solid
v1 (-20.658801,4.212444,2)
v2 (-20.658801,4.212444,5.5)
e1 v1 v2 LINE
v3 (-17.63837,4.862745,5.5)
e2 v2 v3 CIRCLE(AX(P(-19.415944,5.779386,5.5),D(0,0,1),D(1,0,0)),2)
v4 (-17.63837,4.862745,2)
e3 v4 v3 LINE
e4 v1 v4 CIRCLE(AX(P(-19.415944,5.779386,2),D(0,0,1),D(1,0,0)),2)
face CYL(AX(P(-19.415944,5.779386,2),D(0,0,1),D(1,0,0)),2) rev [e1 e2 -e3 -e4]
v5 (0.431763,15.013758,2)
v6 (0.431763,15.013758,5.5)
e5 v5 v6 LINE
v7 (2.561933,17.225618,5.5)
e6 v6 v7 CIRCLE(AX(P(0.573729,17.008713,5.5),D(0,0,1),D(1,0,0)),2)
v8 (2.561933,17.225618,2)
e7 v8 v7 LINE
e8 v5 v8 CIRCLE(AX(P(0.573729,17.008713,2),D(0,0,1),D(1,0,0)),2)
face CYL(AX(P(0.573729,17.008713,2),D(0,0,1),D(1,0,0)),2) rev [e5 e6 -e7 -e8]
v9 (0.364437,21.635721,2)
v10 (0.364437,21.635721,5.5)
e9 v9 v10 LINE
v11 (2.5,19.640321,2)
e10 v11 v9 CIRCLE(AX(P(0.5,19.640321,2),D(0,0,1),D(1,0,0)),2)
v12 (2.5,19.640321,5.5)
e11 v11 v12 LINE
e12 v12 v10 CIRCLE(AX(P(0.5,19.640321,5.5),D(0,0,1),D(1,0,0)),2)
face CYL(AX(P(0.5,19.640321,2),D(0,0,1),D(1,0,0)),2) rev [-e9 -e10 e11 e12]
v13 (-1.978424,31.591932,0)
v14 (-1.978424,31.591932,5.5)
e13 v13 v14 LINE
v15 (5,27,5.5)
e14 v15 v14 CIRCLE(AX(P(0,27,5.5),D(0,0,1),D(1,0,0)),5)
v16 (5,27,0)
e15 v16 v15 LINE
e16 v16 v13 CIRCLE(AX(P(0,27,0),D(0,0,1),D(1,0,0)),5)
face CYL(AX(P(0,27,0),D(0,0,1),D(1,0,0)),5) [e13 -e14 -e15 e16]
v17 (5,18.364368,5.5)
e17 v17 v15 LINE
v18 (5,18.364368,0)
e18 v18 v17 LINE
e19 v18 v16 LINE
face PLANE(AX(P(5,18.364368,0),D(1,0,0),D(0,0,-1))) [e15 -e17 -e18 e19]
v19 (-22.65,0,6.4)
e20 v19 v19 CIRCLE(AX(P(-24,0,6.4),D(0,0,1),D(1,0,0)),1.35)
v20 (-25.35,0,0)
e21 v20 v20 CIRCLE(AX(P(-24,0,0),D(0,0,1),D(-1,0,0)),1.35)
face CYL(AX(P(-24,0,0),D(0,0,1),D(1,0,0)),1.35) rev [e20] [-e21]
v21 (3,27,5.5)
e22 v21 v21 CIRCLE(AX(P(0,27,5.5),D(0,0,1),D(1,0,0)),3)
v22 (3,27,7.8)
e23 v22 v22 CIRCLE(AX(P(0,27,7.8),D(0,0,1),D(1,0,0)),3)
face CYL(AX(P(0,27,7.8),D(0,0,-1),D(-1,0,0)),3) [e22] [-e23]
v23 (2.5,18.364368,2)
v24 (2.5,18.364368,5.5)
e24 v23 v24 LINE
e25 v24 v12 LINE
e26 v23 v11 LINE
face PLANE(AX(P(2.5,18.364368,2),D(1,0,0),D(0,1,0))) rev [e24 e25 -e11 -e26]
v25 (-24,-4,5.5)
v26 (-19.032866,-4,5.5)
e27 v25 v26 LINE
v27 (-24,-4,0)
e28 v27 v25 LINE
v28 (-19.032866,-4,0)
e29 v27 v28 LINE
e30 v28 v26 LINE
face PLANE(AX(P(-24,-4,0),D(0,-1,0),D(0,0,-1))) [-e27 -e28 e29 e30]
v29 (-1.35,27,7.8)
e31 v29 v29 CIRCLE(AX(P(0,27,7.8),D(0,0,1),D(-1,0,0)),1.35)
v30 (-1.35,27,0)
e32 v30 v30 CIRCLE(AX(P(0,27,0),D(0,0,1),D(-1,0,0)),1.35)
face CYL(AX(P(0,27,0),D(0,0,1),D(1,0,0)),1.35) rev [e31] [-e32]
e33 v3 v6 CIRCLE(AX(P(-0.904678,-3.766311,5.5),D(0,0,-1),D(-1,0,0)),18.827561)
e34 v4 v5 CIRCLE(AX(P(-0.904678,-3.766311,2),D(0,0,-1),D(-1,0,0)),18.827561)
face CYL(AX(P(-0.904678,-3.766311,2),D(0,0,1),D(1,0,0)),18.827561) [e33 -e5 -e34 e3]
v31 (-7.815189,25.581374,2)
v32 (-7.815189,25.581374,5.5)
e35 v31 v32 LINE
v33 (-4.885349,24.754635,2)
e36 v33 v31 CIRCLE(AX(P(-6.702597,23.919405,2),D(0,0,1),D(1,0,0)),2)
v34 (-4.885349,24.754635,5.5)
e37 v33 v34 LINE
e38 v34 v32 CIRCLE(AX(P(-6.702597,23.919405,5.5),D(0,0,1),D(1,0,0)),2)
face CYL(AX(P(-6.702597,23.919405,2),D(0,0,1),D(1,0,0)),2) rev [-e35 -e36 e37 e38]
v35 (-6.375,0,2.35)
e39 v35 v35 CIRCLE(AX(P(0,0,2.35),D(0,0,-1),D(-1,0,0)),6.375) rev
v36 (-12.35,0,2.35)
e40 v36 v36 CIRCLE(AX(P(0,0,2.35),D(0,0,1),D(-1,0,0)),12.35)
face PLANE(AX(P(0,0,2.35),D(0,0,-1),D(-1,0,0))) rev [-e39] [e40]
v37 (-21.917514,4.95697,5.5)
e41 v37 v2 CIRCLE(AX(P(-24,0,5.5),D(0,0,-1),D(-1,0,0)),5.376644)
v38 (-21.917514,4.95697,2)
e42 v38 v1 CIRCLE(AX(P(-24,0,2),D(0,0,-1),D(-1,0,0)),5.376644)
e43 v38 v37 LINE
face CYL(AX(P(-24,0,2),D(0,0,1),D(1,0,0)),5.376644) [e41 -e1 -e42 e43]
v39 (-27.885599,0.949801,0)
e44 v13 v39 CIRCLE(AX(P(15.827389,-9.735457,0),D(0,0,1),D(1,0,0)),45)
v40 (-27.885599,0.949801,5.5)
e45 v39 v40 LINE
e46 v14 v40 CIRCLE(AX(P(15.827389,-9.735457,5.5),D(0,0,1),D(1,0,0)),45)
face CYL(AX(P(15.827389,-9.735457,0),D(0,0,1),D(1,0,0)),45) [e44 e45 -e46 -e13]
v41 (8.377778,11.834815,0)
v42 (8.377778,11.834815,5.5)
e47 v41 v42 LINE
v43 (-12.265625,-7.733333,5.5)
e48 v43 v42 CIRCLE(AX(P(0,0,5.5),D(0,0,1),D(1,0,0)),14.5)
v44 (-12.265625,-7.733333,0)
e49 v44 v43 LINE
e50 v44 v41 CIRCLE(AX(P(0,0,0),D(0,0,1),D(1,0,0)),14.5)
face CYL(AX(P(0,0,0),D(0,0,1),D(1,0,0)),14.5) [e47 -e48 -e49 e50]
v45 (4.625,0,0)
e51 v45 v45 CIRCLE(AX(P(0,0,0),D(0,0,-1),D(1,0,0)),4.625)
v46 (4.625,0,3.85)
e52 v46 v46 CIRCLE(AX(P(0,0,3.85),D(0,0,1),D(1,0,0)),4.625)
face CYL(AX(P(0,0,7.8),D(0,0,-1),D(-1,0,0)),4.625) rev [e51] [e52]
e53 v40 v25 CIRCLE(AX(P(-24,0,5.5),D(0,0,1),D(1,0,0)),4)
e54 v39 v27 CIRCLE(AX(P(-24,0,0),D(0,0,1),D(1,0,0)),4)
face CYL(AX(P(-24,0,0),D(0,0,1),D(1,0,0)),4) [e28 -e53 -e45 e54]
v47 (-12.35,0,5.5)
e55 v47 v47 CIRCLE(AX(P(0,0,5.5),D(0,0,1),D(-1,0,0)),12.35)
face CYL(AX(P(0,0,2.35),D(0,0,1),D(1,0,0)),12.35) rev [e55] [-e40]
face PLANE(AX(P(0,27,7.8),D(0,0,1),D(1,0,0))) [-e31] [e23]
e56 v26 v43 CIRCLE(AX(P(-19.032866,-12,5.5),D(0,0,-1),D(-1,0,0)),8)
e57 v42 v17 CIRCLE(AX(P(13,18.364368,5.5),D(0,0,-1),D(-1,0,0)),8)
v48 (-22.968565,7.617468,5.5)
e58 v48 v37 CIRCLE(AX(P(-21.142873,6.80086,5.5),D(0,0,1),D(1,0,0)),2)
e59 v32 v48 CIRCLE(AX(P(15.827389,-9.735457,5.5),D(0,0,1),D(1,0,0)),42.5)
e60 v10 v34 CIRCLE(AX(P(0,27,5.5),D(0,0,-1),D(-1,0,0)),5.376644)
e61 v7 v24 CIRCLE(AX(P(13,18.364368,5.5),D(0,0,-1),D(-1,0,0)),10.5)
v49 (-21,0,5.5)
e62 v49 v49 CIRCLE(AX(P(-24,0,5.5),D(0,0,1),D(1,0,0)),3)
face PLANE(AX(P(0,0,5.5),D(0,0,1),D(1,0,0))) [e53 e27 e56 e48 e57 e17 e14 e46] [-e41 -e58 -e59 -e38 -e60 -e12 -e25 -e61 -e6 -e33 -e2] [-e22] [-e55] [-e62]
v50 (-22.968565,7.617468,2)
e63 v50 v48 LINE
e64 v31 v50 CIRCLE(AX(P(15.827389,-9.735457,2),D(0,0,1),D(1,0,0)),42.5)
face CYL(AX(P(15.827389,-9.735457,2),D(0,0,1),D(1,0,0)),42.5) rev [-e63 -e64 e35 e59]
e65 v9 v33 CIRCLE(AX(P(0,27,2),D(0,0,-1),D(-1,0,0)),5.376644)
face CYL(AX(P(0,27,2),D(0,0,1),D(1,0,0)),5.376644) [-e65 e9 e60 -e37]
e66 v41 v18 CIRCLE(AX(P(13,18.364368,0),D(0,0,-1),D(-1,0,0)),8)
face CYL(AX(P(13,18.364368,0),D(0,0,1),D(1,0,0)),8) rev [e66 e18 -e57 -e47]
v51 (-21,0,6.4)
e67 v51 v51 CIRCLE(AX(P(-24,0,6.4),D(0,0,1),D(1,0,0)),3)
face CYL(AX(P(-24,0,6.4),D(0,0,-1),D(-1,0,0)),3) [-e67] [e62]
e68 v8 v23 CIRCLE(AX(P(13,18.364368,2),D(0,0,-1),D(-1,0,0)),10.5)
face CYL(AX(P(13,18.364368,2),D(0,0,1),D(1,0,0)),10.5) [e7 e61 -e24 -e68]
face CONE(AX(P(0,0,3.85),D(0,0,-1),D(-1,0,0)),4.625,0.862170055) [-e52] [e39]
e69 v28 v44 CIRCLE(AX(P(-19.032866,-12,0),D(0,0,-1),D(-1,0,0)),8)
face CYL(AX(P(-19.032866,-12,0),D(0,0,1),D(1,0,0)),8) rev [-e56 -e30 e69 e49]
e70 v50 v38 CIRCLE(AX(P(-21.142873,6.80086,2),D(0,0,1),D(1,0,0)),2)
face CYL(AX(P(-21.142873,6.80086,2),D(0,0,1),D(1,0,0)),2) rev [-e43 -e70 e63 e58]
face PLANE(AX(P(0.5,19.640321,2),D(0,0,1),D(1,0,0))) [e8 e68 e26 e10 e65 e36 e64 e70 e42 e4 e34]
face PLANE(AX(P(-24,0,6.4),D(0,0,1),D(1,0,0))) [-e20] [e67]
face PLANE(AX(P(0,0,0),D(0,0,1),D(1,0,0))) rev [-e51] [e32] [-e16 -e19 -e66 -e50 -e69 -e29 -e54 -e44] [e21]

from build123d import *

# Parameters (mm, degrees)
BOSS_EXTRUDE1_DEPTH = 5.5
SKETCH2_R           = 3
BOSS_EXTRUDE2_DEPTH = 2.3
SKETCH3_R           = 3
BOSS_EXTRUDE3_DEPTH = 0.9
SKETCH4_R           = 4.625
CUT_EXTRUDE1_DEPTH  = 44.230082119
SKETCH5_R           = 1.35
CUT_EXTRUDE2_DEPTH  = 44.230082119
SKETCH7_R           = 12.35
CUT_EXTRUDE4_DEPTH  = 3.15
CUT_EXTRUDE5_DEPTH  = 3.5
SKETCH9_R           = 6.375
SKETCH9_R_2         = 4.625
BOSS_EXTRUDE4_DEPTH = 1.5
CHAMFER1_SIZE2      = 1.75
CHAMFER1_SIZE       = 1.5


with BuildPart() as part:
    # Sketch1 → Boss-Extrude1 (new body)
    with BuildSketch(Plane.XY.offset(5.5)):
        with BuildLine():
            Line((5, 18.364367672), (5, 27))
            ThreePointArc((5, 27), (2.748443387, 31.176847968), (-1.978423579, 31.591932071))
            ThreePointArc((-1.978423579, 31.591932071), (-18.536483892, 19.318360138), (-27.885598891, 0.94980064))
            ThreePointArc((-27.885598891, 0.94980064), (-27.146363183, -2.469898524), (-24, -4))
            Line((-24, -4), (-19.032866311, -4))
            ThreePointArc((-19.032866311, -4), (-15.168499178, -4.995239714), (-12.265624956, -7.733333333))
            ThreePointArc((-12.265624956, -7.733333333), (9.975316712, -10.523452689), (8.377777778, 11.834814722))
            ThreePointArc((8.377777778, 11.834814722), (5.894446616, 14.688621338), (5, 18.364367672))
        make_face()
    extrude(amount=-BOSS_EXTRUDE1_DEPTH)

    # Sketch2 → Boss-Extrude2 (add)
    with BuildSketch(Plane.XY.offset(5.5)):
        with Locations((0, 27)):
            Circle(SKETCH2_R)
    extrude(amount=BOSS_EXTRUDE2_DEPTH)

    # Sketch3 → Boss-Extrude3 (add)
    with BuildSketch(Plane.XY.offset(5.5)):
        with Locations((-24, 0)):
            Circle(SKETCH3_R)
    extrude(amount=BOSS_EXTRUDE3_DEPTH)

    # Sketch4 → Cut-Extrude1 (cut, through all)
    with BuildSketch(Plane(origin=(0, 0, 0), x_dir=(-1, 0, 0), z_dir=(0, 0, -1))):
        with Locations(Location((0, 0, 0), (0, 0, 180))):
            Circle(SKETCH4_R)
    extrude(amount=-CUT_EXTRUDE1_DEPTH, mode=Mode.SUBTRACT)

    # Sketch5 → Cut-Extrude2 (cut, through all)
    with BuildSketch(Plane.XY.offset(7.8)):
        with Locations(Location((0, 27, 0), (0, 0, 180))):
            Circle(SKETCH5_R)
        with Locations((-24, 0)):
            Circle(SKETCH5_R)
    extrude(amount=-CUT_EXTRUDE2_DEPTH, mode=Mode.SUBTRACT)

    # Sketch7 → Cut-Extrude4 (cut)
    with BuildSketch(Plane.XY.offset(5.5)):
        with Locations(Location((0, 0, 0), (0, 0, 180))):
            Circle(SKETCH7_R)
    extrude(amount=-CUT_EXTRUDE4_DEPTH, mode=Mode.SUBTRACT)

    # Sketch8 → Cut-Extrude5 (cut)
    with BuildSketch(Plane.XY.offset(5.5)):
        with BuildLine():
            Line((2.5, 18.364367672), (2.5, 19.640321115))
            ThreePointArc((2.5, 19.640321115), (1.865443882, 21.101677678), (0.364436994, 21.635721494))
            ThreePointArc((0.364436994, 21.635721494), (-2.746191158, 22.377583712), (-4.885348815, 24.754634735))
            ThreePointArc((-4.885348815, 24.754634735), (-6.159449386, 25.844240566), (-7.815189176, 25.581373906))
            ThreePointArc((-7.815189176, 25.581373906), (-16.658270057, 17.667681565), (-22.968564749, 7.617468292))
            ThreePointArc((-22.968564749, 7.617468292), (-23.002979343, 6.066010594), (-21.917514319, 4.956970002))
            ThreePointArc((-21.917514319, 4.956970002), (-21.262726036, 4.627702396), (-20.658800912, 4.212444287))
            ThreePointArc((-20.658800912, 4.212444287), (-18.994988647, 3.824188919), (-17.638370065, 4.862745371))
            ThreePointArc((-17.638370065, 4.862745371), (-10.125827676, 12.648544298), (0.431762956, 15.013758475))
            ThreePointArc((0.431762956, 15.013758475), (2.014294705, 15.621352145), (2.561932671, 17.225618165))
            ThreePointArc((2.561932671, 17.225618165), (2.5154946, 17.794151464), (2.5, 18.364367672))
        make_face()
    extrude(amount=-CUT_EXTRUDE5_DEPTH, mode=Mode.SUBTRACT)

    # Sketch9 → Boss-Extrude4 (add)
    with BuildSketch(Plane.XY.offset(2.35)):
        with Locations(Location((0, 0, 0), (0, 0, 180))):
            Circle(SKETCH9_R)
        Circle(SKETCH9_R_2, mode=Mode.SUBTRACT)
    extrude(amount=BOSS_EXTRUDE4_DEPTH)

    # Chamfer1
    chamfer1_edges = [part.edges().sort_by_distance(p)[0] for p in [
        (6.375, 0, 3.85),
    ]]
    chamfer1_side = [part.faces().sort_by_distance(p)[0] for p in [
        (6.375, 0, 3.82),
    ]]
    chamfer(chamfer1_edges, length=CHAMFER1_SIZE - 0.0001, length2=CHAMFER1_SIZE2 - 0.0001, reference=chamfer1_side[0])  # a hair under: the kernel refuses the full size


solid = part.part
